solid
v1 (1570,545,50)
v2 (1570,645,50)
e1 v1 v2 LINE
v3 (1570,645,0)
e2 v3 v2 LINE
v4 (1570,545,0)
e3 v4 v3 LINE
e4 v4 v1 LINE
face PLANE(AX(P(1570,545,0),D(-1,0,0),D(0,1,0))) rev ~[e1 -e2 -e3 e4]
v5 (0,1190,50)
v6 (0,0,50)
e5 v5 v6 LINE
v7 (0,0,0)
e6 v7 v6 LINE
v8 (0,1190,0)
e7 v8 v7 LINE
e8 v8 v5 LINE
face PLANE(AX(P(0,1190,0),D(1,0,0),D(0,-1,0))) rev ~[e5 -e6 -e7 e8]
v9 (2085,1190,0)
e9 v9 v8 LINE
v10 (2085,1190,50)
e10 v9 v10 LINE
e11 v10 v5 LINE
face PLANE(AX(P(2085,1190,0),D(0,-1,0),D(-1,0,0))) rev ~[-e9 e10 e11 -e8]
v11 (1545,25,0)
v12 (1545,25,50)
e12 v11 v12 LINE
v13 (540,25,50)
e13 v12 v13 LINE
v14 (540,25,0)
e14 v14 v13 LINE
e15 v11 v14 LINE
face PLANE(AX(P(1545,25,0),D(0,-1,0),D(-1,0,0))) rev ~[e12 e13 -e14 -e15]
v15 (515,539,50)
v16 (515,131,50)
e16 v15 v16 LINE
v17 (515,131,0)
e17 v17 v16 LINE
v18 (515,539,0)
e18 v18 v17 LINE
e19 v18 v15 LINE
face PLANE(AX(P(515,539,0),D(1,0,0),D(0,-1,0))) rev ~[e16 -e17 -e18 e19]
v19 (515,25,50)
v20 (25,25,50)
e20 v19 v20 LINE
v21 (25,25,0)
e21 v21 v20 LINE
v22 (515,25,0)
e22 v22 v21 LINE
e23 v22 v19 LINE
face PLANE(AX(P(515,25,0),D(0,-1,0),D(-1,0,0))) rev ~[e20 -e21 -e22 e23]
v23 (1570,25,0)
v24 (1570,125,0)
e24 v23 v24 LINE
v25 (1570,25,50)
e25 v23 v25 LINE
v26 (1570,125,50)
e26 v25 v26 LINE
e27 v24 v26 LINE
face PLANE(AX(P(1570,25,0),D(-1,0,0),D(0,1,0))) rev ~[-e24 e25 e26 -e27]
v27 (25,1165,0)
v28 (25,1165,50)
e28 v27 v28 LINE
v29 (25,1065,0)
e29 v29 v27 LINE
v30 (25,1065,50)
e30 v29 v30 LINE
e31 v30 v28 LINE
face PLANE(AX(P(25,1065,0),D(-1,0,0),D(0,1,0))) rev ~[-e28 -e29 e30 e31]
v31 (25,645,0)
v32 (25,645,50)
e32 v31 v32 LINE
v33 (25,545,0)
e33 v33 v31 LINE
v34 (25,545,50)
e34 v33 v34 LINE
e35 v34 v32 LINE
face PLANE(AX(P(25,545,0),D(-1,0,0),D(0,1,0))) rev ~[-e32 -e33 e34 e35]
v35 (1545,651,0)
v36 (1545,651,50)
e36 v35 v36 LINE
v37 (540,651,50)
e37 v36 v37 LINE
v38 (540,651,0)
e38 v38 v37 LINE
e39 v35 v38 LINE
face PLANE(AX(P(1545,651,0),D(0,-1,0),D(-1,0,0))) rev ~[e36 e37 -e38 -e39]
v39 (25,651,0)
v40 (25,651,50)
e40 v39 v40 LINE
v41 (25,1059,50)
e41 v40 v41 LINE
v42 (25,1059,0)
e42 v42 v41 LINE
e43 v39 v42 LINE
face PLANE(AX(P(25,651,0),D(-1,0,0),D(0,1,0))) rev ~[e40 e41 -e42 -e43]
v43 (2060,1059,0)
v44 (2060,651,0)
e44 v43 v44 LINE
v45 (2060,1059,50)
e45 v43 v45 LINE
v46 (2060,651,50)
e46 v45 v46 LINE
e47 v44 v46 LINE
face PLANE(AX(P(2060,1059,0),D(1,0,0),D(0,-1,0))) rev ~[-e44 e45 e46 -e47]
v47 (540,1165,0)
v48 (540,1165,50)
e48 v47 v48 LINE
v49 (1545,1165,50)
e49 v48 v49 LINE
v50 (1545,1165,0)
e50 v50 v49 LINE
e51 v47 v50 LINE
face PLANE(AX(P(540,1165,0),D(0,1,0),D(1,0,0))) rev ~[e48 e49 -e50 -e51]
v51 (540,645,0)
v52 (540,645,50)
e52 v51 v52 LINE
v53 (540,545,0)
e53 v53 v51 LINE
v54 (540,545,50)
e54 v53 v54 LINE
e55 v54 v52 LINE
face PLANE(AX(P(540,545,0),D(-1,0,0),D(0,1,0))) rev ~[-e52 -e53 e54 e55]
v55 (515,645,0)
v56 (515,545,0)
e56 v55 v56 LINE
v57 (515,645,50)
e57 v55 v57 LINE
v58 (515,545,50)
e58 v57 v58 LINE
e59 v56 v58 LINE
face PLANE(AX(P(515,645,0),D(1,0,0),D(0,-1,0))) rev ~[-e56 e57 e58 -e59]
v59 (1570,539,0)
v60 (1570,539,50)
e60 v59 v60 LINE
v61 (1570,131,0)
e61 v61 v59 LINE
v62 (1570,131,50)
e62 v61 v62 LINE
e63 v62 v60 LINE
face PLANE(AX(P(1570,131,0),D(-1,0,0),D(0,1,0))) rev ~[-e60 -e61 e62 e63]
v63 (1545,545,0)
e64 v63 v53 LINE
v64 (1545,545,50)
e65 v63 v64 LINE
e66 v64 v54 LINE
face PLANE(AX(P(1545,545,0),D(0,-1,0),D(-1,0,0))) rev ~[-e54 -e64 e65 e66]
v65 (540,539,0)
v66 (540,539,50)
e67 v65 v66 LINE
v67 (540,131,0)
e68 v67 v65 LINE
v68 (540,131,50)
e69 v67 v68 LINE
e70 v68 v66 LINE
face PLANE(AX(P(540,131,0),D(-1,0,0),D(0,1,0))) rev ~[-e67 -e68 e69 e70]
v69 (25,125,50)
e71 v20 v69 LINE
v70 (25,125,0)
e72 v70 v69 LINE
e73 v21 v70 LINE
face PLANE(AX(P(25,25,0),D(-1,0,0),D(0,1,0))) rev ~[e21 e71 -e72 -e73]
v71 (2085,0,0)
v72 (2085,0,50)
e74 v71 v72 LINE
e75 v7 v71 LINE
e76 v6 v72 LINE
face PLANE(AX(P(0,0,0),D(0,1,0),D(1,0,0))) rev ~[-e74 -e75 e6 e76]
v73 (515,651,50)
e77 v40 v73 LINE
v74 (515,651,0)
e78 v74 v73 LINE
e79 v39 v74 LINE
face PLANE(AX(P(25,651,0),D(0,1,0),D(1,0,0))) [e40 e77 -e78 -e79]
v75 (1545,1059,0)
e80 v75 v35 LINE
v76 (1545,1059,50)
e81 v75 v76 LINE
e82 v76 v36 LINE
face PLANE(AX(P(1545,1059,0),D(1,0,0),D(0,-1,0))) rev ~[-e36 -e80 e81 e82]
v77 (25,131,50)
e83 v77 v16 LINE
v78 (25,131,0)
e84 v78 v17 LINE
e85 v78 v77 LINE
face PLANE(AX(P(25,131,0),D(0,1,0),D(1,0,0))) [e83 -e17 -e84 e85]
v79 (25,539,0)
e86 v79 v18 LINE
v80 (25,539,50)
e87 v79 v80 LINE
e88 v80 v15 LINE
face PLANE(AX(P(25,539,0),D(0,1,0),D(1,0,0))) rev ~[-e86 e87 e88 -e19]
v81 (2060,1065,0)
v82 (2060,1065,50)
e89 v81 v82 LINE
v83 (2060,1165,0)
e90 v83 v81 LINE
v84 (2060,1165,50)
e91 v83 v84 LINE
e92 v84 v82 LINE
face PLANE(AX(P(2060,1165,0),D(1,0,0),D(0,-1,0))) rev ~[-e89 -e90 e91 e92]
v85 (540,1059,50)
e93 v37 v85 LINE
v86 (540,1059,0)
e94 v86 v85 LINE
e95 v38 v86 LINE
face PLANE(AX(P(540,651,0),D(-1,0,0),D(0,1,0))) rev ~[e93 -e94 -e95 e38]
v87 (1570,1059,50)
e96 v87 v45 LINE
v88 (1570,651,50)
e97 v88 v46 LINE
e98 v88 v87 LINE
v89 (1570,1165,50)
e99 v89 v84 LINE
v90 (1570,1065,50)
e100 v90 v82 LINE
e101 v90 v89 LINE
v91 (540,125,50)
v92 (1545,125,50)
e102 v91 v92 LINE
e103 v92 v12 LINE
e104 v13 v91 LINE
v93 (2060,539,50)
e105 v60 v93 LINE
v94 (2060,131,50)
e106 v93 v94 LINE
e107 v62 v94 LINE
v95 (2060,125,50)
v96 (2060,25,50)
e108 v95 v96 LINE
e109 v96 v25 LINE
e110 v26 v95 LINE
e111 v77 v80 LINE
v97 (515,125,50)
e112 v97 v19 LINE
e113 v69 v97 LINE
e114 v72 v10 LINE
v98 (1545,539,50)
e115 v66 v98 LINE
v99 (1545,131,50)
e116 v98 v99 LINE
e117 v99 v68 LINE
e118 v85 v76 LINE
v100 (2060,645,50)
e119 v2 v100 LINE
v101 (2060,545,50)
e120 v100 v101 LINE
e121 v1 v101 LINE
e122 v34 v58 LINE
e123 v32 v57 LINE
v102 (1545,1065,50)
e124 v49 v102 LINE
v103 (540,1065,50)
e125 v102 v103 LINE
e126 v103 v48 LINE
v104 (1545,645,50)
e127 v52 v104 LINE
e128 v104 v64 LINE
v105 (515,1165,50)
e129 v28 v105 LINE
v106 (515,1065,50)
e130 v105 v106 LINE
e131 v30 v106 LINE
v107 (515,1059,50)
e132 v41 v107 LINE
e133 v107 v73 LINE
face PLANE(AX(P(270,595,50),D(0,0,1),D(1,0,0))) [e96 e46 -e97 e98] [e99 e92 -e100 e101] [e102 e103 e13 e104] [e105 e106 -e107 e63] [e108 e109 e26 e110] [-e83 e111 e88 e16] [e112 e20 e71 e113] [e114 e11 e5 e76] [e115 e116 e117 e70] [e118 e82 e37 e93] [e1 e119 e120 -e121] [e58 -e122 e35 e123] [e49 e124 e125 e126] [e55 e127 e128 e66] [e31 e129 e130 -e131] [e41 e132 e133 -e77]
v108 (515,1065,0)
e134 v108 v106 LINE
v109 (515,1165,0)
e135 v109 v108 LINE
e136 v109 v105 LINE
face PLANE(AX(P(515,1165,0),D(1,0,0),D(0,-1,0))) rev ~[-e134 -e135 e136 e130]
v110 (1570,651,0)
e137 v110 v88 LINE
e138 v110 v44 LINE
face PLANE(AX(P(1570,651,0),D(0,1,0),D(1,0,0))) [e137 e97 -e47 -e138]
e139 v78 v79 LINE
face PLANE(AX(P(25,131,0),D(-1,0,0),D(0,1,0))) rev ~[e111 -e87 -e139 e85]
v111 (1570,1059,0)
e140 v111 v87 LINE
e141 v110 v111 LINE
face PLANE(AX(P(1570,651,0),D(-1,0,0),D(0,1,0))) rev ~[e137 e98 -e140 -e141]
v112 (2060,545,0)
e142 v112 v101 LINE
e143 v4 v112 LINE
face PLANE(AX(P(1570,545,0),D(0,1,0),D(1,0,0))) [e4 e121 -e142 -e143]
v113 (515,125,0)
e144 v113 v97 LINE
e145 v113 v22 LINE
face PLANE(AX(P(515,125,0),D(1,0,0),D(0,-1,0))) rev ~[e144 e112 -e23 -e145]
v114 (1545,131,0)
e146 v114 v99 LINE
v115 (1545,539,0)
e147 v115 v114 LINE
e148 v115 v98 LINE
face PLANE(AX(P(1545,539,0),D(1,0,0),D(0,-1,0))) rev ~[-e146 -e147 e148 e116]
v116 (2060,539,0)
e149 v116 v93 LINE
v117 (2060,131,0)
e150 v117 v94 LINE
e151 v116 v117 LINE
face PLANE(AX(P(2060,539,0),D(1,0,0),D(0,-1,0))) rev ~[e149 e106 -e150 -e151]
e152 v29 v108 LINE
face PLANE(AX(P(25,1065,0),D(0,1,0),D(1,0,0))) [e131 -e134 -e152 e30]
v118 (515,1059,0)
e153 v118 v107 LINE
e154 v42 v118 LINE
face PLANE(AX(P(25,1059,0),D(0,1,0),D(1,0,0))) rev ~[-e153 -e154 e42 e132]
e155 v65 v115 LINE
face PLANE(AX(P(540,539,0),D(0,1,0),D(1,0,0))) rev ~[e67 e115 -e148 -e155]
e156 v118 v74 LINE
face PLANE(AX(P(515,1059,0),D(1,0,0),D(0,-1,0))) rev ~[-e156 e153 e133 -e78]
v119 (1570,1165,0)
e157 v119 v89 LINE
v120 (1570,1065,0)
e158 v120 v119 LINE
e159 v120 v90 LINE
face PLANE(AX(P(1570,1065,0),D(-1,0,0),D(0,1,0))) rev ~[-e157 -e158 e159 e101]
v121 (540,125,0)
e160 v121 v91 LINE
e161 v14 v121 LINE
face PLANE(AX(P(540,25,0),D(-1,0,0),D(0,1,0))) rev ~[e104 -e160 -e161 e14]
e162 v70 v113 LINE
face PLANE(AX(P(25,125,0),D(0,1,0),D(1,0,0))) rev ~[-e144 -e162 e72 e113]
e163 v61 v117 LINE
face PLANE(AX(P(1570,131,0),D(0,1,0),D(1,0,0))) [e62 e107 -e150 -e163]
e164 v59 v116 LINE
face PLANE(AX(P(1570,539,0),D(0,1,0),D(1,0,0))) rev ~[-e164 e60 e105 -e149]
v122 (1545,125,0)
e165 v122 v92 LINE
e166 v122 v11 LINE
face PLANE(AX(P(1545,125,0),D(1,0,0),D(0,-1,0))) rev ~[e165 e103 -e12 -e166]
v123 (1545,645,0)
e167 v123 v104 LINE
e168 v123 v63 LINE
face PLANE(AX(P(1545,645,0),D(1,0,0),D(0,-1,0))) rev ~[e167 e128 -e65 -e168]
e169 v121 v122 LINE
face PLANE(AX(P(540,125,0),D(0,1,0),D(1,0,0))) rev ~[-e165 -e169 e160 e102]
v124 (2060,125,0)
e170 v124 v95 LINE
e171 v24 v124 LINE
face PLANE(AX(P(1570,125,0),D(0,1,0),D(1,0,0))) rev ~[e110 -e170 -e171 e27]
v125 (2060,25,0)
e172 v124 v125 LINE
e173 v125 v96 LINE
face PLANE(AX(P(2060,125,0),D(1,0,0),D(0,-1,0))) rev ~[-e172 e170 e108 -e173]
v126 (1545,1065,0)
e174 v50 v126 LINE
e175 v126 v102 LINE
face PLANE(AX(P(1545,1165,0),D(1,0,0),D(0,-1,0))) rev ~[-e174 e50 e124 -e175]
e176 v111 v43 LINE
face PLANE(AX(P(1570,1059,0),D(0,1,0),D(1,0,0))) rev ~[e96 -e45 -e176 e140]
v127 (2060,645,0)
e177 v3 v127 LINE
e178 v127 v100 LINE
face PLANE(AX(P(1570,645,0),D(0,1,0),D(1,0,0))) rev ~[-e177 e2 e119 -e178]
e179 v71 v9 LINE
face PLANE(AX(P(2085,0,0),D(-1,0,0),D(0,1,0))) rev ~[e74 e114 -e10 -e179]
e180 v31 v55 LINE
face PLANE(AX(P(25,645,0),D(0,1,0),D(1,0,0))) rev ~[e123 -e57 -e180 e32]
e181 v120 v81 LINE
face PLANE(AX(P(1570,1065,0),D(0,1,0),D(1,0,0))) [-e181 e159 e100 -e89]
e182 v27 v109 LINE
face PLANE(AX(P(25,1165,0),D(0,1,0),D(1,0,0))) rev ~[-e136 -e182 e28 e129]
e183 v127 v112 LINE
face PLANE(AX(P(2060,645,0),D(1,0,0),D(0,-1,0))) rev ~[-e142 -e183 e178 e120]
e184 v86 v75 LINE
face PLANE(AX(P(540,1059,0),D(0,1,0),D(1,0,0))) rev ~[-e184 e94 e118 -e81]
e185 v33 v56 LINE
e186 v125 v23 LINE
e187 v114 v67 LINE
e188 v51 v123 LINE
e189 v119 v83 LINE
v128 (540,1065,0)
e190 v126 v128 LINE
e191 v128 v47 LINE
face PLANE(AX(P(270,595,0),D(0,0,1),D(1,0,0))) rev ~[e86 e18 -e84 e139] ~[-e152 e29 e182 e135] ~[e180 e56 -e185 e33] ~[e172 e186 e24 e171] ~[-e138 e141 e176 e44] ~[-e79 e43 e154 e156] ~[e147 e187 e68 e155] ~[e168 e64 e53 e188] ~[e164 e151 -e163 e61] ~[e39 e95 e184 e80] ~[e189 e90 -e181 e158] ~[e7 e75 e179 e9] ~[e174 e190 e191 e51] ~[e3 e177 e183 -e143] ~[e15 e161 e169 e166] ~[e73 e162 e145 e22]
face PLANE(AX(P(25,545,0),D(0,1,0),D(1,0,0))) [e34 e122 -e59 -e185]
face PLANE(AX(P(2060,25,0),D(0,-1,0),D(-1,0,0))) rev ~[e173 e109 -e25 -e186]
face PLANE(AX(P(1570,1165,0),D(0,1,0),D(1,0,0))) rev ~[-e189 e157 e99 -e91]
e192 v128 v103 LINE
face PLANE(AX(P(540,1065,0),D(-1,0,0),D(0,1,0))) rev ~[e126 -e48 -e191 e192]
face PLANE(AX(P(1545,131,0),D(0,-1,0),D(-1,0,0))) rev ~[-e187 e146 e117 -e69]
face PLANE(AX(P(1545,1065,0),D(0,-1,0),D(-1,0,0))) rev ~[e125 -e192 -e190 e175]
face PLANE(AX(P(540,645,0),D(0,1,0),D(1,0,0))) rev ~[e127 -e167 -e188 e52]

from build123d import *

# Parameters (mm, degrees)
F0_W     = 490
F0_H     = 6
F0_W_2   = 25
F1_DEPTH = 50


# Not quite as in the source:
# - a feature names something its author has since deleted; it is built from what else it names
# - the program builds the solid bodies; features that only make, move or delete a surface that nothing else refers to are left out


with BuildPart() as f1:
    # F0 (on Top) → F1 (new body)
    with BuildSketch(Plane.XY):
        Polygon((0, 1190), (0, 0), (515, 0), (540, 0), (540, 25), (540, 125), (540, 131), (540, 539), (540, 545), (540, 645), (540, 651), (540, 1059), (540, 1065), (540, 1165), (540, 1190), (515, 1190), align=None)
        Polygon((25, 1065), (25, 1165), (515, 1165), (515, 1065), (515, 1059), (515, 651), (515, 645), (515, 545), (515, 539), (515, 131), (515, 125), (515, 25), (25, 25), (25, 125), (25, 131), (25, 539), (25, 545), (25, 645), (25, 651), (25, 1059), align=None, mode=Mode.SUBTRACT)
        Polygon((540, 25), (540, 0), (1030, 0), (1055, 0), (1545, 0), (1570, 0), (1570, 25), (1570, 125), (1570, 131), (1570, 539), (1570, 545), (1570, 645), (1570, 651), (1570, 1059), (1570, 1065), (1570, 1165), (1570, 1190), (1545, 1190), (1055, 1190), (1030, 1190), (540, 1190), (540, 1165), (1030, 1165), (1055, 1165), (1545, 1165), (1545, 1065), (1545, 1059), (1545, 651), (1545, 645), (1545, 545), (1545, 539), (1545, 131), (1545, 125), (1545, 25), (1055, 25), (1030, 25), align=None)
        Polygon((1570, 25), (1570, 0), (2085, 0), (2085, 1190), (1570, 1190), (1570, 1165), (2060, 1165), (2060, 1065), (2060, 1059), (2060, 651), (2060, 645), (2060, 545), (2060, 539), (2060, 131), (2060, 125), (2060, 25), align=None)
        with Locations((270, 542)):
            Rectangle(F0_W, F0_H)
        with Locations((270, 128)):
            Rectangle(F0_W, F0_H)
        with Locations((270, 648)):
            Rectangle(F0_W, F0_H)
        with Locations((270, 1062)):
            Rectangle(F0_W, F0_H)
        with Locations((785, 648)):
            Rectangle(F0_W, F0_H)
        with Locations((1300, 648)):
            Rectangle(F0_W, F0_H)
        with Locations((1300, 542)):
            Rectangle(F0_W, F0_H)
        with Locations((785, 542)):
            Rectangle(F0_W, F0_H)
        with Locations((1815, 542)):
            Rectangle(F0_W, F0_H)
        with Locations((1815, 648)):
            Rectangle(F0_W, F0_H)
        with Locations((1815, 1062)):
            Rectangle(F0_W, F0_H)
        with Locations((1300, 1062)):
            Rectangle(F0_W, F0_H)
        with Locations((785, 1062)):
            Rectangle(F0_W, F0_H)
        with Locations((1815, 128)):
            Rectangle(F0_W, F0_H)
        with Locations((785, 128)):
            Rectangle(F0_W, F0_H)
        with Locations((1300, 128)):
            Rectangle(F0_W, F0_H)
        with Locations((1042.5, 128)):
            Rectangle(F0_W_2, F0_H)
        with Locations((1042.5, 542)):
            Rectangle(F0_W_2, F0_H)
        with Locations((1042.5, 1062)):
            Rectangle(F0_W_2, F0_H)
        with Locations((1042.5, 648)):
            Rectangle(F0_W_2, F0_H)
    extrude(amount=F1_DEPTH)


solid = f1.part
